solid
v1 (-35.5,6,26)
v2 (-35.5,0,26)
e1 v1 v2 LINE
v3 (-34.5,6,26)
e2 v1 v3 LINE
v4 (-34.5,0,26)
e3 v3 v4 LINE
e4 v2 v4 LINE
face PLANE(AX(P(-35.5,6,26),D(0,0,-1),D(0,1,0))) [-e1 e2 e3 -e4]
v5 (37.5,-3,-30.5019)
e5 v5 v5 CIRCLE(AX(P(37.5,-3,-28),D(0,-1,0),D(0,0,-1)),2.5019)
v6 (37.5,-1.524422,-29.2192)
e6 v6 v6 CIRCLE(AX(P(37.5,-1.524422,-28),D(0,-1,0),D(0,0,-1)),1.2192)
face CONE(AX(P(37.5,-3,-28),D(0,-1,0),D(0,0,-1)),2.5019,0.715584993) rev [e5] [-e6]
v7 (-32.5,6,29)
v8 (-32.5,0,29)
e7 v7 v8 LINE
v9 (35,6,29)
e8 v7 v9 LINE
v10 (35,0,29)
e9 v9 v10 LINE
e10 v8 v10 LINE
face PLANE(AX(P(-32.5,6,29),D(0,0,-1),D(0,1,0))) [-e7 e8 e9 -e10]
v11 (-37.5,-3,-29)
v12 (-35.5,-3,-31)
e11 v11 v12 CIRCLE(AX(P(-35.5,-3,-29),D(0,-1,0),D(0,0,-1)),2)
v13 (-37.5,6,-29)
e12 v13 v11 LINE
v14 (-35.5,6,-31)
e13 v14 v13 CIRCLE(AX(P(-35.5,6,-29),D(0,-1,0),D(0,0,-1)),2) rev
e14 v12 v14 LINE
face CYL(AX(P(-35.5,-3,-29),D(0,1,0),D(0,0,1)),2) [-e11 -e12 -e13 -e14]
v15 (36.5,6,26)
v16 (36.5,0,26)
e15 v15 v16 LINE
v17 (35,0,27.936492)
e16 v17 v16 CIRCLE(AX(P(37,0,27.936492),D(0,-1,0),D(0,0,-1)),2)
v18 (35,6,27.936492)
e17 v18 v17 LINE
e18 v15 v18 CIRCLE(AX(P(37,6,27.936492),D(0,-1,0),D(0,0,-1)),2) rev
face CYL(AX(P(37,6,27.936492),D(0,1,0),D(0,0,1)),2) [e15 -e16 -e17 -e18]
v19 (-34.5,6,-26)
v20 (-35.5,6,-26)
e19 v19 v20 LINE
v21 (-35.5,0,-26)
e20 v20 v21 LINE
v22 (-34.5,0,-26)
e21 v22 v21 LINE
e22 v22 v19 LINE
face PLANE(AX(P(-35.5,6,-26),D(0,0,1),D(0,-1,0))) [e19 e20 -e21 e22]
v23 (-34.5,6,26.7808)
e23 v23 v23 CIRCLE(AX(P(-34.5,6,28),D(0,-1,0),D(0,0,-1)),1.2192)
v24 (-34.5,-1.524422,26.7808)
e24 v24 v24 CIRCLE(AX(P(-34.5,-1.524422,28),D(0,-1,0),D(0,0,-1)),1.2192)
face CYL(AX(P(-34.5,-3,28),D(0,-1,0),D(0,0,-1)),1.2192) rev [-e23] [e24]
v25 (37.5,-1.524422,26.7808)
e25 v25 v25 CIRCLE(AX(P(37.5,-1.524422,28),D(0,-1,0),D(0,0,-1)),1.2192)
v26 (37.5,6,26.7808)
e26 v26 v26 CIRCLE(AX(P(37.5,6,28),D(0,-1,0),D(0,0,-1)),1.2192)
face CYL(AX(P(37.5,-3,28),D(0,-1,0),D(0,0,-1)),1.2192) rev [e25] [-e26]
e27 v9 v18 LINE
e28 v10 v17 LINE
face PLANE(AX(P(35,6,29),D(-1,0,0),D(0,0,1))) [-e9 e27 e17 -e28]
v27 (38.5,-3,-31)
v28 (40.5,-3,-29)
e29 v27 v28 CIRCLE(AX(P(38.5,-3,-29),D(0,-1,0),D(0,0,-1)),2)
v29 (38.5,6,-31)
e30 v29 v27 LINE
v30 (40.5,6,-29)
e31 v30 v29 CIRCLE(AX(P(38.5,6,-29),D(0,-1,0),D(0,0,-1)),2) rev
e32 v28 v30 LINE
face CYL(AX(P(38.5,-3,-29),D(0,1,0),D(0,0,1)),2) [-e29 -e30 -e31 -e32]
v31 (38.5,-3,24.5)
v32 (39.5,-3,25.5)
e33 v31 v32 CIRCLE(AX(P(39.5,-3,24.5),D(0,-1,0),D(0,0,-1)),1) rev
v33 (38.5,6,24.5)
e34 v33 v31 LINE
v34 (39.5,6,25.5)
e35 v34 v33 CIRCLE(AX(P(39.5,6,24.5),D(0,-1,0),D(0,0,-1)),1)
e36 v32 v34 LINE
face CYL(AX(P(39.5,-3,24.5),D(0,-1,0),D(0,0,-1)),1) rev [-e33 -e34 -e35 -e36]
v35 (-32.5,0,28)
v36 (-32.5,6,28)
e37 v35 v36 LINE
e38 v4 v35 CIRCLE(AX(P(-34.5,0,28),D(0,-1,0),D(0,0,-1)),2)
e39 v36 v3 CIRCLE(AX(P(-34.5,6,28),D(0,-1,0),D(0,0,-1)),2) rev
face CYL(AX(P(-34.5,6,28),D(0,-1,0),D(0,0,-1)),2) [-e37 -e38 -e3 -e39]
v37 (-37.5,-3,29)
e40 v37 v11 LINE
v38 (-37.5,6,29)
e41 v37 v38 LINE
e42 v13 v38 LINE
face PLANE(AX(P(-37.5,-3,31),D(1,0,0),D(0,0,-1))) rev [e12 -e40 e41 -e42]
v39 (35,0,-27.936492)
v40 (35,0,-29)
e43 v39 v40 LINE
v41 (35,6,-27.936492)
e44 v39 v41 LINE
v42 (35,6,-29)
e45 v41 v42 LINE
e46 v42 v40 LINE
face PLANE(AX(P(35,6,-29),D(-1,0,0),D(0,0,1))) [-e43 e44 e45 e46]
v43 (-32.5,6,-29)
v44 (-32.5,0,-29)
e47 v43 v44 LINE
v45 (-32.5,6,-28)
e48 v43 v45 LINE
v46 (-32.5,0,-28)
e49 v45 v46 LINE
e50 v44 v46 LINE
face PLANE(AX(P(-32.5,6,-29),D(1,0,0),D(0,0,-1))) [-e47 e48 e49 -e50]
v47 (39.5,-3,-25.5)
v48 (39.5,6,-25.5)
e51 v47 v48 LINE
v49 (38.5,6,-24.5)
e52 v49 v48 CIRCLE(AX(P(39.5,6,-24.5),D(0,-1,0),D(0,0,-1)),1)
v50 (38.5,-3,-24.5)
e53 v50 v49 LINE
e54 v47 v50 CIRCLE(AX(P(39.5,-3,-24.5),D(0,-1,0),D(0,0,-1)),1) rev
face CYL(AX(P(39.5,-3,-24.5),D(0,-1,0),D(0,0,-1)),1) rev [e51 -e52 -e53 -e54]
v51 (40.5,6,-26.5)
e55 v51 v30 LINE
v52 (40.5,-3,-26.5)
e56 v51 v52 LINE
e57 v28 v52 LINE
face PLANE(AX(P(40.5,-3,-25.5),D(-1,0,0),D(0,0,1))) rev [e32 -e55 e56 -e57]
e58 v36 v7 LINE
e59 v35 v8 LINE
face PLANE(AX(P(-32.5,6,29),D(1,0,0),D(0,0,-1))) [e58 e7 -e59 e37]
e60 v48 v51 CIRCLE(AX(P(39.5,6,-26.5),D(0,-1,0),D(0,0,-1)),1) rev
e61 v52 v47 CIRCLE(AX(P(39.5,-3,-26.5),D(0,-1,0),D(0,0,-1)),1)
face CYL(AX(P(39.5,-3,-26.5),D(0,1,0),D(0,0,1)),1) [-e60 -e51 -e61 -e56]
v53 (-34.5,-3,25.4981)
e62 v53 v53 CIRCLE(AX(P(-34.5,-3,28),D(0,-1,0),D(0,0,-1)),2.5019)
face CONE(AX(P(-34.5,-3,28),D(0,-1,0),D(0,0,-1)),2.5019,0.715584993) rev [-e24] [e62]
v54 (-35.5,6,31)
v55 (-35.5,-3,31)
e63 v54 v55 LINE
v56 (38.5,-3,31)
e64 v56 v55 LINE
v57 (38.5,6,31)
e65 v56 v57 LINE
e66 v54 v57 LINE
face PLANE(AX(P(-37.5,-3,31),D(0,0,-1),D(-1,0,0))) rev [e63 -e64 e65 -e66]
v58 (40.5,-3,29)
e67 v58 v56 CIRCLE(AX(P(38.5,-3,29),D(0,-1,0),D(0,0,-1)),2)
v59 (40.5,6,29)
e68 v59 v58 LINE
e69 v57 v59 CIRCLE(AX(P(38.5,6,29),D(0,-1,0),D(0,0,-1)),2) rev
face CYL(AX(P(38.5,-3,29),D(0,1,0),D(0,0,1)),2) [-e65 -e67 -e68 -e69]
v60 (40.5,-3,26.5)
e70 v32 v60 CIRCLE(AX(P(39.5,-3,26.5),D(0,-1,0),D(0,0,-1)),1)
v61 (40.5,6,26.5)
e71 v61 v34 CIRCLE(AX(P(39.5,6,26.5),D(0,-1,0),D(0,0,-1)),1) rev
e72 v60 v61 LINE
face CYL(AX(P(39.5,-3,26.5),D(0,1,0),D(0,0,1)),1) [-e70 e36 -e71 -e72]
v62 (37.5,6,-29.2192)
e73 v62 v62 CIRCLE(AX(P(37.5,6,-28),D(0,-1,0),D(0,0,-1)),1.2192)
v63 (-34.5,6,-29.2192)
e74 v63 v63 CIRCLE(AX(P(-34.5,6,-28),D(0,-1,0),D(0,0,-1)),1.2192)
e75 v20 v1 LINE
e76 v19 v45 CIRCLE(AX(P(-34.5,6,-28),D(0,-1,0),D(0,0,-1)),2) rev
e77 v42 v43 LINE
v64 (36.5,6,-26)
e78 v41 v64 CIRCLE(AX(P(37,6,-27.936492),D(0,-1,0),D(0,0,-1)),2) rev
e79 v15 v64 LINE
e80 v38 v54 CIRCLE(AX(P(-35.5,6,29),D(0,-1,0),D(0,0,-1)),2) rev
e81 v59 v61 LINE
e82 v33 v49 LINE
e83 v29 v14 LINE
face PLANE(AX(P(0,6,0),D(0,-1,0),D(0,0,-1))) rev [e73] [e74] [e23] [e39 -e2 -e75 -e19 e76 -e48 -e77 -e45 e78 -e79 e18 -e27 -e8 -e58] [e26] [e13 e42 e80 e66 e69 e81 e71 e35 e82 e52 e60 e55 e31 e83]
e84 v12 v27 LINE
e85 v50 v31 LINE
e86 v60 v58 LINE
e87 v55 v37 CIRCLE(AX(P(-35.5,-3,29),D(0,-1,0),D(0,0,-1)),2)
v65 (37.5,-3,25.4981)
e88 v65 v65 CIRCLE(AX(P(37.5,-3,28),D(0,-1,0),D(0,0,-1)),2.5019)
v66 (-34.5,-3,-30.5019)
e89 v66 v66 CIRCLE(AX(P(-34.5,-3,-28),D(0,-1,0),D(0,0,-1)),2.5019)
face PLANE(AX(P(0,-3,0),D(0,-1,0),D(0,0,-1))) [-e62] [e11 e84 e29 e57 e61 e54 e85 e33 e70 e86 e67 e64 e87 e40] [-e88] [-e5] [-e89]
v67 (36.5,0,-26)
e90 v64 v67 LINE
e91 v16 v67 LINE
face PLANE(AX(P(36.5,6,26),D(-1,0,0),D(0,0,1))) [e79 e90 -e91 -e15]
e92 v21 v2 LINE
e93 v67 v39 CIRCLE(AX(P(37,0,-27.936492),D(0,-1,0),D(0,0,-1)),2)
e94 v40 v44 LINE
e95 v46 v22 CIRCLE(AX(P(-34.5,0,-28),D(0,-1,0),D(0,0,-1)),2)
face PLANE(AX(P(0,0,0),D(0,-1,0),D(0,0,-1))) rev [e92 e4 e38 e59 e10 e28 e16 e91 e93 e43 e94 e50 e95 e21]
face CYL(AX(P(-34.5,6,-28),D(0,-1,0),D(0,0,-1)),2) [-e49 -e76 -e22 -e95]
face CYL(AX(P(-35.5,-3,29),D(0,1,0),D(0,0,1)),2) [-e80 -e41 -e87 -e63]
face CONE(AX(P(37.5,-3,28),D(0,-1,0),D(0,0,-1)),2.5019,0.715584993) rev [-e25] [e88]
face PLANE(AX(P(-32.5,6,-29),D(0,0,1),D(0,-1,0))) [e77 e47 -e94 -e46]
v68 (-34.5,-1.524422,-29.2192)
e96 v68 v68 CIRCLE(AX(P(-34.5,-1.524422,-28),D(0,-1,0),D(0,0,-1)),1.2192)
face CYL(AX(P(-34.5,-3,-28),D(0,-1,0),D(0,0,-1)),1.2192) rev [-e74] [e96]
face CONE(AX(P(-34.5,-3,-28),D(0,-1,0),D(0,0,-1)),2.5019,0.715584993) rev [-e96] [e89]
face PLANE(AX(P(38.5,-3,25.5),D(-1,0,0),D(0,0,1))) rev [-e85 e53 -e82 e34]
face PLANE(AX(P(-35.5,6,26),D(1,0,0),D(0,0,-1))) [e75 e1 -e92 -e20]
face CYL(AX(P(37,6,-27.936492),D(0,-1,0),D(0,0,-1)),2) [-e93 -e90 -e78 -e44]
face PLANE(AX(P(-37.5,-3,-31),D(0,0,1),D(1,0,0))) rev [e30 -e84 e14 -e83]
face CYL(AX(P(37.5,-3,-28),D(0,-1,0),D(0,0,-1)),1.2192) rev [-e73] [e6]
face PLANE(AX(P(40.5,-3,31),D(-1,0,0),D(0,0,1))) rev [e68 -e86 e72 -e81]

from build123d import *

# Parameters (mm, degrees)
BOSS_EXTRUDE2_DEPTH                               = 3
BOSS_EXTRUDE3_DEPTH                               = 6
FILLET5_R                                         = 2
CSK_FOR_2_FLAT_HEAD_SOCKET_CAP_SCREW1_D           = 2.4384
CSK_FOR_2_FLAT_HEAD_SOCKET_CAP_SCREW1_CSINK_D     = 5.0038
CSK_FOR_2_FLAT_HEAD_SOCKET_CAP_SCREW1_CSINK_ANGLE = 82
FILLET6_R                                         = 2
FILLET7_R                                         = 1


# Some blends are built 0.0001 mm under size
with BuildPart() as part:
    # Sketch3 → Boss-Extrude2 (new body)
    with BuildSketch(Plane.XZ):
        Polygon((-37.5, 31), (40.5, 31), (40.5, 25.5), (38.5, 25.5), (38.5, -25.5), (40.5, -25.5), (40.5, -31), (-37.5, -31), align=None)
    extrude(amount=BOSS_EXTRUDE2_DEPTH)

    # Sketch4 → Boss-Extrude3 (add)
    with BuildSketch(Plane(origin=(0, 0, 0), x_dir=(1, 0, 0), z_dir=(0, 1, 0))):
        Polygon((-37.5, -31), (40.5, -31), (40.5, -25.5), (38.5, -25.5), (38.5, 25.5), (40.5, 25.5), (40.5, 31), (-37.5, 31), align=None)
        Polygon((-32.5, -29), (35, -29), (35, -26), (36.5, -26), (36.5, 26), (35, 26), (35, 29), (-32.5, 29), (-32.5, 26), (-35.5, 26), (-35.5, -26), (-32.5, -26), align=None, mode=Mode.SUBTRACT)
    extrude(amount=BOSS_EXTRUDE3_DEPTH)

    # Fillet5
    # the kernel refuses this fillet: 2 mm, written as the material it takes off along each edge
    with BuildSketch(Plane(origin=(35, 0, 26), x_dir=(0, 0, 1), z_dir=(0, 1, 0))) as fillet5_piece_1:
        with BuildLine():
            CenterArc((1.936491673, 2), FILLET5_R, 194.477512186, 75.522487814)
            Line((0, 1.5), (-0.038729833, 1.49))
            ThreePointArc((-0.038729833, 1.49), (-0.04, 0.75), (-0.04, 0))
            Line((-0.04, 0), (0, -0.04))
            Line((0, -0.04), (1.936491673, -0.04))
            Line((1.936491673, -0.04), (1.936491673, 0))
        make_face()
    extrude(amount=10.841229183, mode=Mode.SUBTRACT)
    with BuildSketch(Plane(origin=(35, 0, -26), x_dir=(1, 0, 0), z_dir=(0, 1, 0))) as fillet5_piece_2:
        with BuildLine():
            CenterArc((2, 1.936491673), FILLET5_R, 180, 75.522487814)
            Line((0, 1.936491673), (-0.04, 1.936491673))
            Line((-0.04, 1.936491673), (-0.04, 0))
            Line((-0.04, 0), (0, -0.04))
            ThreePointArc((0, -0.04), (0.75, -0.04), (1.49, -0.038729833))
            Line((1.49, -0.038729833), (1.5, 0))
        make_face()
    extrude(amount=10.841229183, mode=Mode.SUBTRACT)
    with BuildSketch(Plane(origin=(-32.5, 0, -26), x_dir=(0, 0, -1), z_dir=(0, 1, 0)), Plane(origin=(-32.5, 0, 26), x_dir=(-1, 0, 0), z_dir=(0, 1, 0))) as fillet5_piece_3:
        with BuildLine():
            CenterArc((FILLET5_R, FILLET5_R), FILLET5_R, 180, 90)
            Line((0, FILLET5_R), (-FILLET5_R * 0.02, FILLET5_R))
            Line((-FILLET5_R * 0.02, FILLET5_R), (-FILLET5_R * 0.02, -FILLET5_R * 0.02))
            Line((-FILLET5_R * 0.02, -FILLET5_R * 0.02), (FILLET5_R, -FILLET5_R * 0.02))
            Line((FILLET5_R, -FILLET5_R * 0.02), (FILLET5_R, 0))
        make_face()
    extrude(amount=11, mode=Mode.SUBTRACT)

    # CSK for #2 Flat Head Socket Cap Screw1 (through all)
    with Locations(Plane(origin=(0, -3, 0), x_dir=(-1, 0, 0), z_dir=(0, -1, 0))):
        with Locations((-37.5, 28), (34.5, 28), (34.5, -28), (-37.5, -28)):
            CounterSinkHole(CSK_FOR_2_FLAT_HEAD_SOCKET_CAP_SCREW1_D / 2, CSK_FOR_2_FLAT_HEAD_SOCKET_CAP_SCREW1_CSINK_D / 2, counter_sink_angle=CSK_FOR_2_FLAT_HEAD_SOCKET_CAP_SCREW1_CSINK_ANGLE)

    # Fillet6
    fillet6_edges = [part.edges().sort_by_distance(p)[0] for p in [
        (40.5, 1.5, -31),
        (-37.5, 1.5, -31),
        (-37.5, 1.5, 31),
        (40.5, 1.5, 31),
    ]]
    fillet(fillet6_edges, radius=FILLET6_R)

    # Fillet7
    fillet7_edges = [part.edges().sort_by_distance(p)[0] for p in [
        (38.5, 1.5, -25.5),
        (38.5, 1.5, 25.5),
    ]]
    fillet(fillet7_edges, radius=FILLET7_R)
    fillet7_2_edges = [part.edges().sort_by_distance(p)[0] for p in [
        (40.5, 1.5, -25.5),
        (40.5, 1.5, 25.5),
    ]]
    fillet(fillet7_2_edges, radius=FILLET7_R - 0.0001)  # a hair under: the kernel refuses the full size


solid = part.part
